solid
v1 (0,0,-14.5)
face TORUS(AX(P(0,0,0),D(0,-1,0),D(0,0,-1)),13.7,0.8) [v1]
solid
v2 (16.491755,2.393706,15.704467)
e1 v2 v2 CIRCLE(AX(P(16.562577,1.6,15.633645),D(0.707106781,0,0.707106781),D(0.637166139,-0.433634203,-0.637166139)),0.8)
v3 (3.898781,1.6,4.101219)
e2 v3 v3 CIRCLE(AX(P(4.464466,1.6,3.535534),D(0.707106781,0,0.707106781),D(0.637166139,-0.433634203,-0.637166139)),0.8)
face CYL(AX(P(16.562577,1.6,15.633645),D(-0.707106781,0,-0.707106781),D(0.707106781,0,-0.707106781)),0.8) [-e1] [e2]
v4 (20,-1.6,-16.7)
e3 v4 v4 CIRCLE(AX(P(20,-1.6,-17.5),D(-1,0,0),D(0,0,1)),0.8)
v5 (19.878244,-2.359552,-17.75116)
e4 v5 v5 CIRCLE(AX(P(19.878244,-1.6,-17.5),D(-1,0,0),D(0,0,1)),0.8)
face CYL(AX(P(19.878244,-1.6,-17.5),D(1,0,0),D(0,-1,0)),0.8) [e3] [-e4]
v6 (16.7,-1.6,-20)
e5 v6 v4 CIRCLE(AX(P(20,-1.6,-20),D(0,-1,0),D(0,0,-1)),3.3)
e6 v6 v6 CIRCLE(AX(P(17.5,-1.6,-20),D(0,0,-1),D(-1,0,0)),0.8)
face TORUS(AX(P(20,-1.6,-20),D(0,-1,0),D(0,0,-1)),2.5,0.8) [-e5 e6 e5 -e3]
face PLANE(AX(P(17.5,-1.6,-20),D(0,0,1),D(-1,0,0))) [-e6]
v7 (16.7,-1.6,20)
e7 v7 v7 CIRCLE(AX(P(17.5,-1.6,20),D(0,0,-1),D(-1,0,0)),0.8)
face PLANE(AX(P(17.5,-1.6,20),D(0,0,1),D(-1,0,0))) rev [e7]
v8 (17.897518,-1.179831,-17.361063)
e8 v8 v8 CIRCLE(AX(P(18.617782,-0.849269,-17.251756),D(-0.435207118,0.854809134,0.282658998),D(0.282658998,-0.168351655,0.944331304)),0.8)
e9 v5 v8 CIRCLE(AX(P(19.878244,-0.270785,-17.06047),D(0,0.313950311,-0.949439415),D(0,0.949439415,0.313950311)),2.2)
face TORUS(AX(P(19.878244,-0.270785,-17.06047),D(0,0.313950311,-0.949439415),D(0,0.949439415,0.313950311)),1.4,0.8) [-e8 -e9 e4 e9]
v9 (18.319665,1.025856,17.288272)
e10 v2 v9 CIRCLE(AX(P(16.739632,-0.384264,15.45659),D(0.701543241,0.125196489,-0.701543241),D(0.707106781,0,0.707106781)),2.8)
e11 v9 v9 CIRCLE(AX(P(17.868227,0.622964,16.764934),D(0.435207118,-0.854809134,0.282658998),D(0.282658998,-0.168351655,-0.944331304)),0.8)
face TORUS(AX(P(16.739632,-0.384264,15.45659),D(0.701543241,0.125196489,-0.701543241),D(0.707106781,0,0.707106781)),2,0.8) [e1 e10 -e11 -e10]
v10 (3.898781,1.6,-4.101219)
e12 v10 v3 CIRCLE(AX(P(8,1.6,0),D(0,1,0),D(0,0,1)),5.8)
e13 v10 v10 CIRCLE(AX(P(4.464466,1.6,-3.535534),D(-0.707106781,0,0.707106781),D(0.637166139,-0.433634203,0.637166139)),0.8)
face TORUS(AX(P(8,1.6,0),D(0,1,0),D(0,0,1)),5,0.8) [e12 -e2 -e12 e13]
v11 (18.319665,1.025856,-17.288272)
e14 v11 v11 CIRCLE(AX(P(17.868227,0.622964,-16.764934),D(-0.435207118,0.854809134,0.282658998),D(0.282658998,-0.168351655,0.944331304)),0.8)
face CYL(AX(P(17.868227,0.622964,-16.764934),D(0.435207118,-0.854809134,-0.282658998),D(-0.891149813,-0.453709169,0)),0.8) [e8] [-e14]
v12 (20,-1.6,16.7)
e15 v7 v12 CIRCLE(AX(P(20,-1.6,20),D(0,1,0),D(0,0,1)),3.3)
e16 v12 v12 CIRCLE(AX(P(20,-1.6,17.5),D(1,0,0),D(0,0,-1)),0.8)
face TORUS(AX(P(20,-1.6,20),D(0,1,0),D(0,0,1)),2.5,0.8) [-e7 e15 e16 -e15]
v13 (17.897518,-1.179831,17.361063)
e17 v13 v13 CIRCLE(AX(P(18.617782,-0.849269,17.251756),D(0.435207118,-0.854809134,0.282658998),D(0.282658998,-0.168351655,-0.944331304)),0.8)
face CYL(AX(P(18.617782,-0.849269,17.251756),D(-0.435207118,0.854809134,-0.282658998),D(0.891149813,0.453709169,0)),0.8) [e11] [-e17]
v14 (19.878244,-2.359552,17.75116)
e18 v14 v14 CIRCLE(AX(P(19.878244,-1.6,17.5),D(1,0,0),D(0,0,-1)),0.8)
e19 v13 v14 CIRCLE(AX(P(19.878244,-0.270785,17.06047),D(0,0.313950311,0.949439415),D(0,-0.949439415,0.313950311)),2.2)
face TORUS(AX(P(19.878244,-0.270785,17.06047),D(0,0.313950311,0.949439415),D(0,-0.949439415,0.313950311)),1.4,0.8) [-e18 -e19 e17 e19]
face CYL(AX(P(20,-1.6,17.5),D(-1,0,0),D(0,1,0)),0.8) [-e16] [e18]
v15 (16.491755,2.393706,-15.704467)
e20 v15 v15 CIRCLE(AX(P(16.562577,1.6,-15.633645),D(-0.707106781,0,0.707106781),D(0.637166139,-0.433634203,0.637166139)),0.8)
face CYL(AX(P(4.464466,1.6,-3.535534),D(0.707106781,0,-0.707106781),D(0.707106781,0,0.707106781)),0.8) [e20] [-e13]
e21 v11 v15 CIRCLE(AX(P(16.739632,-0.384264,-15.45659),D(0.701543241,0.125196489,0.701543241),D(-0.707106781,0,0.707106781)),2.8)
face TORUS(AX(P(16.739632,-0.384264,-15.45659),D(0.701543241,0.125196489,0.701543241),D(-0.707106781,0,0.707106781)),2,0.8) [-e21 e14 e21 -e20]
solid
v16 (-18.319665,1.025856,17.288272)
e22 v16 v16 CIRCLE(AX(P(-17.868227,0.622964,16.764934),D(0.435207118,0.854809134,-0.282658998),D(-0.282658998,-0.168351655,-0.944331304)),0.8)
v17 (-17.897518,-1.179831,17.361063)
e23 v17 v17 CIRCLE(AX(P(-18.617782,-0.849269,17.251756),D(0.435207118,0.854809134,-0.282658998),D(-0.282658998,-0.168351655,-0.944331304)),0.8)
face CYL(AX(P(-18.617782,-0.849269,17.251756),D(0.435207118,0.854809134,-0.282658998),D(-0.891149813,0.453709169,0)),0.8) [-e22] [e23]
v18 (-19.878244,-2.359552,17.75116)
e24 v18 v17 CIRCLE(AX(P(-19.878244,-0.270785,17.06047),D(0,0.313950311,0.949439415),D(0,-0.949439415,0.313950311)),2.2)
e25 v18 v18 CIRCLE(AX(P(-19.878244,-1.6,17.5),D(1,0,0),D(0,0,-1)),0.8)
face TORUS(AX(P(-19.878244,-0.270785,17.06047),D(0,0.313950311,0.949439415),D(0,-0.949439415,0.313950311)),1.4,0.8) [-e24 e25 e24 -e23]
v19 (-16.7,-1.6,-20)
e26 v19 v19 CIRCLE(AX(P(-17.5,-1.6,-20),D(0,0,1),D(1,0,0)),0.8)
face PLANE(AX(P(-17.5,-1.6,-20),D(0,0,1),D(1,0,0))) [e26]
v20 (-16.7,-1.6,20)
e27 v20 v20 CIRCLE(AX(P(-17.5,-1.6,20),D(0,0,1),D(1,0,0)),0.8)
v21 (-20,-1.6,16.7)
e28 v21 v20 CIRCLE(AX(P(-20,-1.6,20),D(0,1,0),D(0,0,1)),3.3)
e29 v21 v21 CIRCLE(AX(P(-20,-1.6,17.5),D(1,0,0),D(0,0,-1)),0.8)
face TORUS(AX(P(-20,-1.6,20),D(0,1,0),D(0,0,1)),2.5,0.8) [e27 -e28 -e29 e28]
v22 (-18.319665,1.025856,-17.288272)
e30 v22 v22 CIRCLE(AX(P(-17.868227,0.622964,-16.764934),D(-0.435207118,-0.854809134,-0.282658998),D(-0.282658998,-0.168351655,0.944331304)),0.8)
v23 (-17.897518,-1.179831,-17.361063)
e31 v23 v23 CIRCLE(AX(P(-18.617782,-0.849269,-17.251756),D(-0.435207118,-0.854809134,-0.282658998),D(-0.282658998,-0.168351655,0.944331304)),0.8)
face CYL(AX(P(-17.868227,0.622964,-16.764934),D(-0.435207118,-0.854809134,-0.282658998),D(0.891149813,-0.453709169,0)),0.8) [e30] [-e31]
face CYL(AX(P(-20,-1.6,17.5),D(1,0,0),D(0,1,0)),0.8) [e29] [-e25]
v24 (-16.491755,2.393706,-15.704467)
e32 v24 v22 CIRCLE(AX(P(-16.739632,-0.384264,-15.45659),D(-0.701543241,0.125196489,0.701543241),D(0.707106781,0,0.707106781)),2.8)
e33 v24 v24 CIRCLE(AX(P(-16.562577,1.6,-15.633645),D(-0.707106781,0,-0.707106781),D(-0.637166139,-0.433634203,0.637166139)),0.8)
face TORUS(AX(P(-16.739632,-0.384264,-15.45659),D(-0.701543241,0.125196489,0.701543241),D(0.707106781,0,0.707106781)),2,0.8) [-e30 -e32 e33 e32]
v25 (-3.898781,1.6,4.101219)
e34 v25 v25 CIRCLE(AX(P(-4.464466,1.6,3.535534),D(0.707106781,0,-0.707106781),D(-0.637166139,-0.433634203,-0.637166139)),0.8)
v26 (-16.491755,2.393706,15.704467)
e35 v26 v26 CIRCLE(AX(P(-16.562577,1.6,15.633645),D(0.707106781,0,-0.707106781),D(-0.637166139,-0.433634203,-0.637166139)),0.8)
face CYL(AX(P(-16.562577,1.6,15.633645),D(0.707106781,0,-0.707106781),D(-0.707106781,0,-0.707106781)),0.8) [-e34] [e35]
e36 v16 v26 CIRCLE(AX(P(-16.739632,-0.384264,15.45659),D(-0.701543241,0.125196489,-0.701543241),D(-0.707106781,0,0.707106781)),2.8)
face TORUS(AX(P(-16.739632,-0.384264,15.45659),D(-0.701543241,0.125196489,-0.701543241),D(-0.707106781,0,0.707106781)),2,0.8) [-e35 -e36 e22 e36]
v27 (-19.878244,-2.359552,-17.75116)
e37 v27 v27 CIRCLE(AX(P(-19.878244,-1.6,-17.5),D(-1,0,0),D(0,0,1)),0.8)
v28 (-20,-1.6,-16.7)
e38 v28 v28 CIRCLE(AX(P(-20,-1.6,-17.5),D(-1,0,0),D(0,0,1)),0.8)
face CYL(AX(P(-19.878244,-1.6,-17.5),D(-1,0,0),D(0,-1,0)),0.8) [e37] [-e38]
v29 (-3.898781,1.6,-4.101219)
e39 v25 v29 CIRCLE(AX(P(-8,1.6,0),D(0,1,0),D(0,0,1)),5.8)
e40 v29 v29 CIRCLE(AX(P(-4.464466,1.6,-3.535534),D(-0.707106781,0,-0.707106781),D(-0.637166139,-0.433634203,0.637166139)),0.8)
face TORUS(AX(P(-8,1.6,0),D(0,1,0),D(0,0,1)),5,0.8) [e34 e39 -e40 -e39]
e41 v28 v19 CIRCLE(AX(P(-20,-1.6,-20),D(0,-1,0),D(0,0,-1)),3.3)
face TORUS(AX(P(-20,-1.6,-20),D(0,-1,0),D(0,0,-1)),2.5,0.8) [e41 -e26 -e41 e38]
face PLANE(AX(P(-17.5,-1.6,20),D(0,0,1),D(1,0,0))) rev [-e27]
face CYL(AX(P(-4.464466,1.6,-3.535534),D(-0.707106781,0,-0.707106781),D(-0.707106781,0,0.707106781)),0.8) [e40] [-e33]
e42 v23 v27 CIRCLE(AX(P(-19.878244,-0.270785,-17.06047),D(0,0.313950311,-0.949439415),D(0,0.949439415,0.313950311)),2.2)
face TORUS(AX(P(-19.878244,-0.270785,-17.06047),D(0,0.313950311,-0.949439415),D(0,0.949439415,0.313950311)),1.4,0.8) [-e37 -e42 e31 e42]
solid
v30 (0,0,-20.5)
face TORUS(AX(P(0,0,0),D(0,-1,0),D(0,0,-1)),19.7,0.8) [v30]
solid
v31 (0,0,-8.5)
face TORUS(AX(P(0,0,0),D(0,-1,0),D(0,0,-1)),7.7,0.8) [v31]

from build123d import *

# Parameters (mm, degrees)
SKETCH_2_R           = 0.8
SWEEP_2_OUTLINE_R    = 0.8
SWEEP_2_ANGLE        = 270
SWEEP_2_2_OUTLINE_R  = 0.8
SWEEP_2_2_ANGLE      = 64.201526
SWEEP_2_3_OUTLINE_R  = 0.8
SWEEP_2_3_ANGLE      = 59.495369
SWEEP_2_4_OUTLINE_R  = 0.8
SWEEP_2_4_ANGLE      = 90
SWEEP_2_5_OUTLINE_R  = 0.8
SWEEP_2_5_ANGLE      = 59.495369
SWEEP_2_6_OUTLINE_R  = 0.8
SWEEP_2_6_ANGLE      = 64.201526
SWEEP_2_7_OUTLINE_R  = 0.8
SWEEP_2_7_ANGLE      = 270
SWEEP_START          = -20.0000001
SWEEP_2_8_OUTLINE_R  = 0.8
SWEEP_2_8_DEPTH      = 0.121755873
SWEEP_START_2        = -13.704918083
SWEEP_2_9_OUTLINE_R  = 0.8
SWEEP_2_9_DEPTH      = 1.722294661
SWEEP_START_3        = -22.766167048
SWEEP_2_10_OUTLINE_R = 0.8
SWEEP_2_10_DEPTH     = 17.109312899
SWEEP_2_11_OUTLINE_R = 0.8
SWEEP_2_11_DEPTH     = 17.109312899
SWEEP_2_12_OUTLINE_R = 0.8
SWEEP_2_12_DEPTH     = 1.722294661
SWEEP_2_13_OUTLINE_R = 0.8
SWEEP_2_13_DEPTH     = 0.121755873


with BuildPart() as part:
    # По траектории1: sweep along a path in Эскиз1
    with BuildLine(Plane(origin=(0, 0, 0), x_dir=(1, 0, 0), z_dir=(0, 1, 0))) as sweep_1_path:
        CenterArc((0, 0), 19.7, 0, 360)
    # Эскиз2 → По траектории1 (sweep)
    with BuildSketch(Plane.XY):
        with Locations((19.7, 0)):
            Circle(SKETCH_2_R)
        with Locations((13.7, 0)):
            Circle(SKETCH_2_R)
        with Locations((7.7, 0)):
            Circle(SKETCH_2_R)
    sweep(path=sweep_1_path.line)


with BuildPart() as body_2:
    # По траектории2: read off the stored shape, not the designer's step
    # По траектории2 outline → По траектории2 (revolve)
    with BuildSketch(Plane(origin=(-20, 0, -20), x_dir=(1, 0, 0), z_dir=(0, 0, 1))):
        with Locations((2.5, -1.6)):
            Circle(SWEEP_2_OUTLINE_R)
    revolve(axis=Axis((-20, 0, -20), (0, 1, 0)), revolution_arc=SWEEP_2_ANGLE)

    # Sweep 2 2 outline → Sweep 2 2 (revolve)
    with BuildSketch(Plane(origin=(-19.878244327, -5.329425132, -1.762276403), x_dir=(0.9003303642061087, -0.41320279112716485, -0.13663340987187678), z_dir=(0.4352071176905264, 0.8548091340984039, 0.28265899768703884))):
        with Locations((1.4, 16.112869261)):
            Circle(SWEEP_2_2_OUTLINE_R)
    revolve(axis=Axis((-19.878244327, -5.329425132, -1.762276403), (0, 0.3139503108242731, -0.9494394147776584)), revolution_arc=SWEEP_2_2_ANGLE)

    # Sweep 2 3 outline → Sweep 2 3 (revolve)
    with BuildSketch(Plane(origin=(-16.141916519, -0.490931402, -16.054305543), x_dir=(-0.5642976565367117, 0.5036141214653419, -0.6541719739394735), z_dir=(-0.4352071176904984, -0.8548091340984196, -0.28265899768703395))):
        with Locations((2, -0.852000479)):
            Circle(SWEEP_2_3_OUTLINE_R)
    revolve(axis=Axis((-16.141916519, -0.490931402, -16.054305543), (0.701543241389085, -0.12519648925829302, -0.701543241389078)), revolution_arc=SWEEP_2_3_ANGLE)

    # Sweep 2 4 outline → Sweep 2 4 (revolve)
    with BuildSketch(Plane(origin=(-8, 0, 0), x_dir=(0.7071067811865462, 0, 0.7071067811865488), z_dir=(-0.7071067811865488, 0, 0.7071067811865462))):
        with Locations((5.000000002, 1.6)):
            Circle(SWEEP_2_4_OUTLINE_R)
    revolve(axis=Axis((-8, 0, 0), (0, 1, 0)), revolution_arc=SWEEP_2_4_ANGLE)

    # Sweep 2 5 outline → Sweep 2 5 (revolve)
    with BuildSketch(Plane(origin=(-16.141916519, -0.490931402, 16.054305543), x_dir=(0.0885272865352453, 0.9921319665636316, 0.08852728653521139), z_dir=(0.7071067811865503, -2.468164561619801e-14, -0.7071067811865446))):
        with Locations((2, -0.852000479)):
            Circle(SWEEP_2_5_OUTLINE_R)
    revolve(axis=Axis((-16.141916519, -0.490931402, 16.054305543), (0.7015432413890837, -0.12519648925820898, 0.701543241389094)), revolution_arc=SWEEP_2_5_ANGLE)

    # Sweep 2 6 outline → Sweep 2 6 (revolve)
    with BuildSketch(Plane(origin=(-19.878244327, -5.329425132, 1.762276403), x_dir=(0, -0.9494394147776485, 0.3139503108243032), z_dir=(-1, 0, 0))):
        with Locations((1.4, 16.112869261)):
            Circle(SWEEP_2_6_OUTLINE_R)
    revolve(axis=Axis((-19.878244327, -5.329425132, 1.762276403), (0, 0.31395031082430325, 0.9494394147776487)), revolution_arc=SWEEP_2_6_ANGLE)

    # Sweep 2 7 outline → Sweep 2 7 (revolve)
    with BuildSketch(Plane(origin=(-20, 0, 20), x_dir=(0, 0, -1), z_dir=(1, 0, 0))):
        with Locations((2.5, -1.6)):
            Circle(SWEEP_2_7_OUTLINE_R)
    revolve(axis=Axis((-20, 0, 20), (0, 1, 0)), revolution_arc=SWEEP_2_7_ANGLE)

    # Sweep 2 8 outline → Sweep 2 8 (add)
    with BuildSketch(Plane.YZ.offset(SWEEP_START)):
        with Locations((-1.6, -17.5)):
            Circle(SWEEP_2_8_OUTLINE_R)
    extrude(amount=SWEEP_2_8_DEPTH)

    # Sweep 2 9 outline → Sweep 2 9 (add)
    with BuildSketch(Plane(origin=(0, 0, 0), x_dir=(0.9003303642061189, -0.41320279112714453, -0.13663340987187061), z_dir=(0.4352071176905052, 0.8548091340984133, 0.2826589976870431)).offset(SWEEP_START_2)):
        with Locations((-14.054067781, 16.112869261)):
            Circle(SWEEP_2_9_OUTLINE_R)
    extrude(amount=SWEEP_2_9_DEPTH)

    # Sweep 2 10 outline → Sweep 2 10 (add)
    with BuildSketch(Plane(origin=(0, 0, 0), x_dir=(0.7071067811865509, 0, -0.707106781186544), z_dir=(0.707106781186544, 0, 0.707106781186551)).offset(SWEEP_START_3)):
        with Locations((-0.656854248, 1.6)):
            Circle(SWEEP_2_10_OUTLINE_R)
    extrude(amount=SWEEP_2_10_DEPTH)

    # Sweep 2 11 outline → Sweep 2 11 (add)
    with BuildSketch(Plane(origin=(0, 0, 0), x_dir=(0.707106781186542, 0, 0.707106781186553), z_dir=(0.707106781186553, 0, -0.707106781186542)).offset(SWEEP_START_3)):
        with Locations((-0.656854248, -1.6)):
            Circle(SWEEP_2_11_OUTLINE_R)
    extrude(amount=SWEEP_2_11_DEPTH)

    # Sweep 2 12 outline → Sweep 2 12 (add)
    with BuildSketch(Plane(origin=(0, 0, 0), x_dir=(0.9003303642061442, -0.41320279112709024, 0.13663340987186817), z_dir=(0.4352071176904529, 0.8548091340984277, -0.28265899768707997)).offset(SWEEP_START_2)):
        with Locations((-14.054067781, -16.112869261)):
            Circle(SWEEP_2_12_OUTLINE_R)
    extrude(amount=SWEEP_2_12_DEPTH)

    # Sweep 2 13 outline → Sweep 2 13 (add)
    with BuildSketch(Plane.YZ.offset(SWEEP_START)):
        with Locations((-1.6, 17.5)):
            Circle(SWEEP_2_13_OUTLINE_R)
    extrude(amount=SWEEP_2_13_DEPTH)


with BuildPart() as body_3:
    # Зеркальное отражение1: mirrored copy
    add(body_2.part.mirror(Plane(origin=(0, 0, 0), x_dir=(0, 0, 1), z_dir=(1, 0, 0))))


solid = Compound([part.part, body_2.part, body_3.part])
